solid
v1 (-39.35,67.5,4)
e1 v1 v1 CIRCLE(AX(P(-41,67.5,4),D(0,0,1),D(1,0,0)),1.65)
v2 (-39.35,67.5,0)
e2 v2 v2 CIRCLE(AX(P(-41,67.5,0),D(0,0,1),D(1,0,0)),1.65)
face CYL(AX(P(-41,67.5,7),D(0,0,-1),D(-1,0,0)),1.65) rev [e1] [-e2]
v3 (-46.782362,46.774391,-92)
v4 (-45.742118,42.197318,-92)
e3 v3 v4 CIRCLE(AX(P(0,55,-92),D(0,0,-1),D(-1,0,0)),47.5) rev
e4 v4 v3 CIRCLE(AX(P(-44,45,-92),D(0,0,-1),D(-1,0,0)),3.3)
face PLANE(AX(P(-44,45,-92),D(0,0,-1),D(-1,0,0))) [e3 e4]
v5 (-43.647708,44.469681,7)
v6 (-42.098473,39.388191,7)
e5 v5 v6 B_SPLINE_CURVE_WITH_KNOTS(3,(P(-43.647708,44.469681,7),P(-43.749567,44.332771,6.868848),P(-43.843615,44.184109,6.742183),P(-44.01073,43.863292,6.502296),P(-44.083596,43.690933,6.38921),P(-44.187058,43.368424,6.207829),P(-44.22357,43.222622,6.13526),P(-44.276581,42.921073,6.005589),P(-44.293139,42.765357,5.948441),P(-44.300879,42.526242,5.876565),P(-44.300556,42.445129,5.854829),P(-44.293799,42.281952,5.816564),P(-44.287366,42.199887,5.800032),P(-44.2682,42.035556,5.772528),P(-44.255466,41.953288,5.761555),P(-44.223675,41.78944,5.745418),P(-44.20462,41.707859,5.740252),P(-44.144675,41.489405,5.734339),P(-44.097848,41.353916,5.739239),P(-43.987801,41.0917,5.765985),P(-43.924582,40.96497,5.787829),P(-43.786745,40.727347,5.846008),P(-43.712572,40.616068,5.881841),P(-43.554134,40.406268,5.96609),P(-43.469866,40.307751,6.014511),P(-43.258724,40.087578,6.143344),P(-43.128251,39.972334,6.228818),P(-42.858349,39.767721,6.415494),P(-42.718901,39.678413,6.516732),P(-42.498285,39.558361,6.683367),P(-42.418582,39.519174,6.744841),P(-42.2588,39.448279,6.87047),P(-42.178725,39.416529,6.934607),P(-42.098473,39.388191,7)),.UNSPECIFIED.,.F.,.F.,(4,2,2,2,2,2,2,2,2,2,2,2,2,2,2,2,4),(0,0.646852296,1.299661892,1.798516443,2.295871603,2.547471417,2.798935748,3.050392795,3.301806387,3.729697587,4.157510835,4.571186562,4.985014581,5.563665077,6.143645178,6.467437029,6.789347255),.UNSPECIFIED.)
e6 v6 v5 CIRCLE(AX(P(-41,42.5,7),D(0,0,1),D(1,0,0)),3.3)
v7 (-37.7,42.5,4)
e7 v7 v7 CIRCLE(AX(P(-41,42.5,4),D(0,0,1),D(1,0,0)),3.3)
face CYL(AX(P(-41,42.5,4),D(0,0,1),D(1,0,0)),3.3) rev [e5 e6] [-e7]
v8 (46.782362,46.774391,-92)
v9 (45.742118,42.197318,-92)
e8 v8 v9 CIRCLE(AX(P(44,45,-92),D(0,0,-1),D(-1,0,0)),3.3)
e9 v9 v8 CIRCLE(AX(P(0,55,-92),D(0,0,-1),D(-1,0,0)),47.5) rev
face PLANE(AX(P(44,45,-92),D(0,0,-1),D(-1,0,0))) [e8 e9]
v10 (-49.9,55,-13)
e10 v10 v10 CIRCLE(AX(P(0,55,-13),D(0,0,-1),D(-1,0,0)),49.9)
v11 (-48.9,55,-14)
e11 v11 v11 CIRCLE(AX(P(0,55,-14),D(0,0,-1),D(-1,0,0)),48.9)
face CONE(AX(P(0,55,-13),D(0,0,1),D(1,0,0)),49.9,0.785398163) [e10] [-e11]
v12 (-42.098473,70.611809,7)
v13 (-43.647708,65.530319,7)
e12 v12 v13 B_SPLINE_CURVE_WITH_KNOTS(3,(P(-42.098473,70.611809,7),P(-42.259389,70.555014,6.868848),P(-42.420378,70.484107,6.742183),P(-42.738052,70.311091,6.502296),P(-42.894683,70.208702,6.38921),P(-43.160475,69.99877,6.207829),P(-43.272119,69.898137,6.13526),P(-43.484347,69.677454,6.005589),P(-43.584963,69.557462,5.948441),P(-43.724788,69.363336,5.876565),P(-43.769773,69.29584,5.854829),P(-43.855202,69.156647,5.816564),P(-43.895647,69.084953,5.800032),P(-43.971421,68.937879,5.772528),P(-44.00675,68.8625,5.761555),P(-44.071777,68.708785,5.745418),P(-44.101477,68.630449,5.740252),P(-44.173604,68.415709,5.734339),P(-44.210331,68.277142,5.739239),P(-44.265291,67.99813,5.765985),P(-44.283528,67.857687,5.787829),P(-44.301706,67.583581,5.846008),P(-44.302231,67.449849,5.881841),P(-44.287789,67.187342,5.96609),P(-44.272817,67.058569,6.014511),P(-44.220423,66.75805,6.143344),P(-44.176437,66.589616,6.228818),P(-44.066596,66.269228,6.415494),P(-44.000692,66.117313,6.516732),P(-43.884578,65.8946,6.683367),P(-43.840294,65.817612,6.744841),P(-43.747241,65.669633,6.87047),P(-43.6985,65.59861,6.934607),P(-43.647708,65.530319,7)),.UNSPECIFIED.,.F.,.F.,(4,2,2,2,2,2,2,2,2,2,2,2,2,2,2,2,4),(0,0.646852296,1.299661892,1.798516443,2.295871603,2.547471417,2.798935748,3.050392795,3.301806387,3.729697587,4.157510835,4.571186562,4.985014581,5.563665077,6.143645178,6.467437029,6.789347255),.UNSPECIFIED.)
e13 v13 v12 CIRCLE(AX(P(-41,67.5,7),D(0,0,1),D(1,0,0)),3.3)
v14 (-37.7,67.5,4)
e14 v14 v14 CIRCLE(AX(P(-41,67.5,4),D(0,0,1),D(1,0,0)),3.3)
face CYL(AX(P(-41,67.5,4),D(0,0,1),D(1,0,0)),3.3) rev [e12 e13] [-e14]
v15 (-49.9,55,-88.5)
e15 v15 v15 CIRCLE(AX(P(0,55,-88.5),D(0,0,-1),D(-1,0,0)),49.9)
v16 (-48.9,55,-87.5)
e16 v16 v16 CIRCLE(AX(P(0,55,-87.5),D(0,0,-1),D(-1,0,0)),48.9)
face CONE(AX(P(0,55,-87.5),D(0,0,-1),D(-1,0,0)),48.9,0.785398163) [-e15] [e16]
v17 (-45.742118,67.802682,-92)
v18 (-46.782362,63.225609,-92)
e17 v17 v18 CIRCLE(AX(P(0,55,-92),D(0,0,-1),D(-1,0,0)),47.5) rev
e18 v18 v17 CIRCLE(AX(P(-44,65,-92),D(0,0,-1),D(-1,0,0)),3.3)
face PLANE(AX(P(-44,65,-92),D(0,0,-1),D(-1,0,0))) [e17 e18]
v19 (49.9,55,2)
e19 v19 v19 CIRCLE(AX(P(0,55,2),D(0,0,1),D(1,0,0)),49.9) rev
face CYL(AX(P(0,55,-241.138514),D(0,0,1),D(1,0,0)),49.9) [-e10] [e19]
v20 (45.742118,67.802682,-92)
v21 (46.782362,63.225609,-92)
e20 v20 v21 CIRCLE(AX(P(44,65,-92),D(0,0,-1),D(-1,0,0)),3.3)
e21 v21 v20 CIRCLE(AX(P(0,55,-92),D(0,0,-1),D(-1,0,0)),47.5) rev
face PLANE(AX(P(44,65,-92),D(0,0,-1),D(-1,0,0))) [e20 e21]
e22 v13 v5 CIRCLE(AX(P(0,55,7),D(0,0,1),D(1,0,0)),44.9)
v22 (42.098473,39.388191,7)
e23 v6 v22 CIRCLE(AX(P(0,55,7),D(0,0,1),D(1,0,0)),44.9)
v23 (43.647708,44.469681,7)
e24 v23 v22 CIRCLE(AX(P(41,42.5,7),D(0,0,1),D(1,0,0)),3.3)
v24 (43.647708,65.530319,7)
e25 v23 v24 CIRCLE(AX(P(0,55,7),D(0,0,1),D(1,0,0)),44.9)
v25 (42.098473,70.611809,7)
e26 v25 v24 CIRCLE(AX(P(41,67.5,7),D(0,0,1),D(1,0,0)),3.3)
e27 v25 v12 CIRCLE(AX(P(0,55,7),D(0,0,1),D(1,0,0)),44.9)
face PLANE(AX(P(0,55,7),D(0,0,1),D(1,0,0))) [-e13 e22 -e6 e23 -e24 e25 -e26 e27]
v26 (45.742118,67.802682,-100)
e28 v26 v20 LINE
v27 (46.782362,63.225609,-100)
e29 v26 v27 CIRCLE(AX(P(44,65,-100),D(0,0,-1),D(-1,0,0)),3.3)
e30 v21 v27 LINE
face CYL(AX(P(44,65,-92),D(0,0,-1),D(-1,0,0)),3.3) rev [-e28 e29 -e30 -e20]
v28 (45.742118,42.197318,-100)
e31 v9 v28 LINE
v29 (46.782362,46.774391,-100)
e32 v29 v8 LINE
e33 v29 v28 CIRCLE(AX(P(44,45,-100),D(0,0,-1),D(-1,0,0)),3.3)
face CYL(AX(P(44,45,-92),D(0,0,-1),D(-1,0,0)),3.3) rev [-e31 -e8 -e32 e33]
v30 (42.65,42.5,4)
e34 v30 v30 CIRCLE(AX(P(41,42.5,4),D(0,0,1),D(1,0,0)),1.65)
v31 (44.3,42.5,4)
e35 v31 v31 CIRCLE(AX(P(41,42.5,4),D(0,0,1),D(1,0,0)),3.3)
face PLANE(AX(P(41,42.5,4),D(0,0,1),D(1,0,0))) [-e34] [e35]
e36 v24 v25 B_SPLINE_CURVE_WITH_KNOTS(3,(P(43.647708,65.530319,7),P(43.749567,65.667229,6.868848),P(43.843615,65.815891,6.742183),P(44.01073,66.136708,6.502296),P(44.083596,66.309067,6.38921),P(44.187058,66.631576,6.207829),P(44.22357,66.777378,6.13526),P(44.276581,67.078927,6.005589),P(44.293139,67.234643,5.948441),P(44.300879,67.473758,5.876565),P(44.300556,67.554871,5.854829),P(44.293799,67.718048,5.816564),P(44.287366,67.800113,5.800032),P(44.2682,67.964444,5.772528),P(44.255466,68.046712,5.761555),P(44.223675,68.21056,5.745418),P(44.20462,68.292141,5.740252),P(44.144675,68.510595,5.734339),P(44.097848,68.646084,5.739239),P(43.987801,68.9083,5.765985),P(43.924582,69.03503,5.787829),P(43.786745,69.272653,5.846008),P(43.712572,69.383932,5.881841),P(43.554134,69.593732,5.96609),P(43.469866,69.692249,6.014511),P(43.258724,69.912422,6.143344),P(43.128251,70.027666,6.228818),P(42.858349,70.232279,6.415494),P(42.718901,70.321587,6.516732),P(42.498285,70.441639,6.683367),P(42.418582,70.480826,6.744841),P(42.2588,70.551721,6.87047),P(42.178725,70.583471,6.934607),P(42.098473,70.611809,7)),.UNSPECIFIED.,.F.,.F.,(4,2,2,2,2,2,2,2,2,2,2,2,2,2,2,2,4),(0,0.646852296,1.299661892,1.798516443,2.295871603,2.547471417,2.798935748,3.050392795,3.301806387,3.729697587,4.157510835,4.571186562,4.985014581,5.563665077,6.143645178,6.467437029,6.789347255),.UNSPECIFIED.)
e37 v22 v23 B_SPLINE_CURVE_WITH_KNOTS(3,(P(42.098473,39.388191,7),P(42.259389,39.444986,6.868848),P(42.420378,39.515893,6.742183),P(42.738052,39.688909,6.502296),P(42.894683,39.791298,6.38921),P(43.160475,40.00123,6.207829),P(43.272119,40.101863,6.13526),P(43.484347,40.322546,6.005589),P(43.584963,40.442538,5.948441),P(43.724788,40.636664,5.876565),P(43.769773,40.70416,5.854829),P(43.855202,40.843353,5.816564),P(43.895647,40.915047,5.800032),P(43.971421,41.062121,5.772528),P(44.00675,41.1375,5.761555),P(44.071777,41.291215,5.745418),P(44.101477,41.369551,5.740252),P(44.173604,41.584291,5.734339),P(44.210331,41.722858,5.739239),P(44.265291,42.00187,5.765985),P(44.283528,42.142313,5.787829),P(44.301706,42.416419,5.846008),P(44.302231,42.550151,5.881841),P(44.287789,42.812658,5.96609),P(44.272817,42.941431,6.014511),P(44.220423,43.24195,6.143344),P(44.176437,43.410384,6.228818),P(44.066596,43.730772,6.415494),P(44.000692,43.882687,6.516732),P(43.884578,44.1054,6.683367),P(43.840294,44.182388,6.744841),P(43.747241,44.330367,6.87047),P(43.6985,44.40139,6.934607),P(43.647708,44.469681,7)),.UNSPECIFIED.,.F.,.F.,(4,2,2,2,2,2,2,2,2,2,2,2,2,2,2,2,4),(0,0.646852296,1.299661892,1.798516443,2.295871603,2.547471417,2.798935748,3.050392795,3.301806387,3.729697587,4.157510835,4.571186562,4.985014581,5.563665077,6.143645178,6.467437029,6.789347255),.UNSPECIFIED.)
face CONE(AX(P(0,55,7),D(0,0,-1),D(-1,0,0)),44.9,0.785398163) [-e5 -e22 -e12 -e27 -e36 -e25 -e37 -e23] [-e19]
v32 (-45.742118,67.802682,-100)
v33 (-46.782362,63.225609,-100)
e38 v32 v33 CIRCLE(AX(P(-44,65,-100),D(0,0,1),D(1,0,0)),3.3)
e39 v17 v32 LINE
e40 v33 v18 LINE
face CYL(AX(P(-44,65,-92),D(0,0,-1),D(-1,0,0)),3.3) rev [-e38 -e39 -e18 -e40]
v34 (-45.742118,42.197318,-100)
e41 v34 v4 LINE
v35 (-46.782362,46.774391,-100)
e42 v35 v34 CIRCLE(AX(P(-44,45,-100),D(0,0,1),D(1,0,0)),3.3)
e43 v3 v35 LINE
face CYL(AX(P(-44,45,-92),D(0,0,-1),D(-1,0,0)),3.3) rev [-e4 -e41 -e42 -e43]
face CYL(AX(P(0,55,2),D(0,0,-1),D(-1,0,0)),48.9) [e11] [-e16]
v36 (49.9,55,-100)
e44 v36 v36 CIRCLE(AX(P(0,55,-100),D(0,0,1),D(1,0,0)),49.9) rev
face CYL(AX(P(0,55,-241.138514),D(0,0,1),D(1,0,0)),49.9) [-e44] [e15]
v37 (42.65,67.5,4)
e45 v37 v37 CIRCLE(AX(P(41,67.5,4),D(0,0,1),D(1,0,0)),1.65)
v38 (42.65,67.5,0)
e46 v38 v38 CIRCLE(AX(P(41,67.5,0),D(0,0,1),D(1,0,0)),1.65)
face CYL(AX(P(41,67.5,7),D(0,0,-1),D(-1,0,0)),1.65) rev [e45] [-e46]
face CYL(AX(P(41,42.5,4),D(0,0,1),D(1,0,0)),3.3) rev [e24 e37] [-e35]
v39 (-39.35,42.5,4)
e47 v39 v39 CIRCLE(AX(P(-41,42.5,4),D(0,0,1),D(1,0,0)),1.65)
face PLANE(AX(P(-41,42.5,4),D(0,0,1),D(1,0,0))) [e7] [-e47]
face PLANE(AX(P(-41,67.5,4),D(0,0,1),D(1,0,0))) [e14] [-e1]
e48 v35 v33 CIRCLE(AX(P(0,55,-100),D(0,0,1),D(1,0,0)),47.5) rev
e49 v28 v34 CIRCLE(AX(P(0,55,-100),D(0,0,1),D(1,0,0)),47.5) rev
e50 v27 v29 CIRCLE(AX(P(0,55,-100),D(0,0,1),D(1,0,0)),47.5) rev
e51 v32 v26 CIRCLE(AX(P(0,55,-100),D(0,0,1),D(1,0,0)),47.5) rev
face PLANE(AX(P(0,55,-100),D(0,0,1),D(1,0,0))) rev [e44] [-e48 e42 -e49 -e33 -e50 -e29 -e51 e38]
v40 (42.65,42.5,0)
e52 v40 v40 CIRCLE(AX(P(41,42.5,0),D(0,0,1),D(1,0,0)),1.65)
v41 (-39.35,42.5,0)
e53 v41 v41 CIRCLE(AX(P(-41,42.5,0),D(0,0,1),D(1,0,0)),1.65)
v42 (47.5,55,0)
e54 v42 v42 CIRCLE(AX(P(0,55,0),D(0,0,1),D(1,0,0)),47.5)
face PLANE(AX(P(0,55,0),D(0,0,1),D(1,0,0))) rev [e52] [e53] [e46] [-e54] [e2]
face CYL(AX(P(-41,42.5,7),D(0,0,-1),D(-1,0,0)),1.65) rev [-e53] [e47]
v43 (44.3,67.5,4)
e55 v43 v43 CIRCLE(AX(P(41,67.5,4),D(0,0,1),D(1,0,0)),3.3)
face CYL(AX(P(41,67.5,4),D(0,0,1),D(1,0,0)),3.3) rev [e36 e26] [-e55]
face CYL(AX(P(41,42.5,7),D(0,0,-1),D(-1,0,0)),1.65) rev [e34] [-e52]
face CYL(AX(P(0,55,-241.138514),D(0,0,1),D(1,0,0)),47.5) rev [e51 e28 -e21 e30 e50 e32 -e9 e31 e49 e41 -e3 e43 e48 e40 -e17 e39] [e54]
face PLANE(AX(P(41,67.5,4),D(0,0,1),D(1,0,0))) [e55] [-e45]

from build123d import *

# Parameters (mm, degrees)
SKETCH1_R           = 49.9
SKETCH1_R_2         = 47.5
BOSS_EXTRUDE1_DEPTH = 100
BOSS_EXTRUDE2_START = 7
SKETCH2_R           = 49.9
SKETCH2_R_2         = 1.65
BOSS_EXTRUDE2_DEPTH = 7
SKETCH3_R           = 3.3
CUT_EXTRUDE1_DEPTH  = 3
CHAMFER1_SIZE       = 5
SKETCH5_R           = 3.3
CUT_EXTRUDE2_DEPTH  = 8


with BuildPart() as part:
    # Sketch1 → Boss-Extrude1 (new body)
    with BuildSketch(Plane.XY):
        with Locations((0, 55)):
            Circle(SKETCH1_R)
        with Locations((0, 55)):
            Circle(SKETCH1_R_2, mode=Mode.SUBTRACT)
    extrude(amount=-BOSS_EXTRUDE1_DEPTH)

    # Sketch2 → Boss-Extrude2 (add)
    with BuildSketch(Plane.XY.offset(BOSS_EXTRUDE2_START)):
        with Locations((0, 55)):
            Circle(SKETCH2_R)
        with Locations((41, 67.5)):
            Circle(SKETCH2_R_2, mode=Mode.SUBTRACT)
        with Locations((41, 42.5)):
            Circle(SKETCH2_R_2, mode=Mode.SUBTRACT)
        with Locations((-41, 67.5)):
            Circle(SKETCH2_R_2, mode=Mode.SUBTRACT)
        with Locations((-41, 42.5)):
            Circle(SKETCH2_R_2, mode=Mode.SUBTRACT)
    extrude(amount=-BOSS_EXTRUDE2_DEPTH)

    # Sketch3 → Cut-Extrude1 (cut)
    with BuildSketch(Plane.XY.offset(7)):
        with Locations((-41, 67.5)):
            Circle(SKETCH3_R)
        with Locations((-41, 42.5)):
            Circle(SKETCH3_R)
        with Locations((41, 67.5)):
            Circle(SKETCH3_R)
        with Locations((41, 42.5)):
            Circle(SKETCH3_R)
    extrude(amount=-CUT_EXTRUDE1_DEPTH, mode=Mode.SUBTRACT)

    # Chamfer1
    # the kernel refuses this chamfer: 5 mm, written as the material it takes off along each edge
    with BuildSketch(Plane(origin=(0, 55, 7), x_dir=(1, 0, 0), z_dir=(0, -1, 0))) as chamfer1_piece_1:
        Polygon((49.9, -CHAMFER1_SIZE), (49.9 - CHAMFER1_SIZE, 0), (49.9, 0), align=None)
    revolve(axis=Axis((0, 55, 7), (0, 0, 1)), mode=Mode.SUBTRACT)

    # Sketch4 → Cut-Revolve1 (revolve, cut)
    with BuildSketch(Plane(origin=(0, 0, 0), x_dir=(0, 0, -1), z_dir=(1, 0, 0)), mode=Mode.PRIVATE) as cut_revolve1_sk:
        Polygon((13, 104.9), (14, 103.9), (87.5, 103.9), (88.5, 104.9), align=None)
    revolve(cut_revolve1_sk.sketch.rotate(Axis((0, 55, 2), (0, 0, 1)), 76.43618314), axis=Axis((0, 55, 2), (0, 0, 1)), mode=Mode.SUBTRACT)

    # Sketch5 → Cut-Extrude2 (cut)
    with BuildSketch(Plane(origin=(0, 0, -100), x_dir=(-1, 0, 0), z_dir=(0, 0, -1))):
        with Locations((-44, 45)):
            Circle(SKETCH5_R)
        with Locations((-44, 65)):
            Circle(SKETCH5_R)
        with Locations((44, 45)):
            Circle(SKETCH5_R)
        with Locations((44, 65)):
            Circle(SKETCH5_R)
    extrude(amount=-CUT_EXTRUDE2_DEPTH, mode=Mode.SUBTRACT)


solid = part.part
